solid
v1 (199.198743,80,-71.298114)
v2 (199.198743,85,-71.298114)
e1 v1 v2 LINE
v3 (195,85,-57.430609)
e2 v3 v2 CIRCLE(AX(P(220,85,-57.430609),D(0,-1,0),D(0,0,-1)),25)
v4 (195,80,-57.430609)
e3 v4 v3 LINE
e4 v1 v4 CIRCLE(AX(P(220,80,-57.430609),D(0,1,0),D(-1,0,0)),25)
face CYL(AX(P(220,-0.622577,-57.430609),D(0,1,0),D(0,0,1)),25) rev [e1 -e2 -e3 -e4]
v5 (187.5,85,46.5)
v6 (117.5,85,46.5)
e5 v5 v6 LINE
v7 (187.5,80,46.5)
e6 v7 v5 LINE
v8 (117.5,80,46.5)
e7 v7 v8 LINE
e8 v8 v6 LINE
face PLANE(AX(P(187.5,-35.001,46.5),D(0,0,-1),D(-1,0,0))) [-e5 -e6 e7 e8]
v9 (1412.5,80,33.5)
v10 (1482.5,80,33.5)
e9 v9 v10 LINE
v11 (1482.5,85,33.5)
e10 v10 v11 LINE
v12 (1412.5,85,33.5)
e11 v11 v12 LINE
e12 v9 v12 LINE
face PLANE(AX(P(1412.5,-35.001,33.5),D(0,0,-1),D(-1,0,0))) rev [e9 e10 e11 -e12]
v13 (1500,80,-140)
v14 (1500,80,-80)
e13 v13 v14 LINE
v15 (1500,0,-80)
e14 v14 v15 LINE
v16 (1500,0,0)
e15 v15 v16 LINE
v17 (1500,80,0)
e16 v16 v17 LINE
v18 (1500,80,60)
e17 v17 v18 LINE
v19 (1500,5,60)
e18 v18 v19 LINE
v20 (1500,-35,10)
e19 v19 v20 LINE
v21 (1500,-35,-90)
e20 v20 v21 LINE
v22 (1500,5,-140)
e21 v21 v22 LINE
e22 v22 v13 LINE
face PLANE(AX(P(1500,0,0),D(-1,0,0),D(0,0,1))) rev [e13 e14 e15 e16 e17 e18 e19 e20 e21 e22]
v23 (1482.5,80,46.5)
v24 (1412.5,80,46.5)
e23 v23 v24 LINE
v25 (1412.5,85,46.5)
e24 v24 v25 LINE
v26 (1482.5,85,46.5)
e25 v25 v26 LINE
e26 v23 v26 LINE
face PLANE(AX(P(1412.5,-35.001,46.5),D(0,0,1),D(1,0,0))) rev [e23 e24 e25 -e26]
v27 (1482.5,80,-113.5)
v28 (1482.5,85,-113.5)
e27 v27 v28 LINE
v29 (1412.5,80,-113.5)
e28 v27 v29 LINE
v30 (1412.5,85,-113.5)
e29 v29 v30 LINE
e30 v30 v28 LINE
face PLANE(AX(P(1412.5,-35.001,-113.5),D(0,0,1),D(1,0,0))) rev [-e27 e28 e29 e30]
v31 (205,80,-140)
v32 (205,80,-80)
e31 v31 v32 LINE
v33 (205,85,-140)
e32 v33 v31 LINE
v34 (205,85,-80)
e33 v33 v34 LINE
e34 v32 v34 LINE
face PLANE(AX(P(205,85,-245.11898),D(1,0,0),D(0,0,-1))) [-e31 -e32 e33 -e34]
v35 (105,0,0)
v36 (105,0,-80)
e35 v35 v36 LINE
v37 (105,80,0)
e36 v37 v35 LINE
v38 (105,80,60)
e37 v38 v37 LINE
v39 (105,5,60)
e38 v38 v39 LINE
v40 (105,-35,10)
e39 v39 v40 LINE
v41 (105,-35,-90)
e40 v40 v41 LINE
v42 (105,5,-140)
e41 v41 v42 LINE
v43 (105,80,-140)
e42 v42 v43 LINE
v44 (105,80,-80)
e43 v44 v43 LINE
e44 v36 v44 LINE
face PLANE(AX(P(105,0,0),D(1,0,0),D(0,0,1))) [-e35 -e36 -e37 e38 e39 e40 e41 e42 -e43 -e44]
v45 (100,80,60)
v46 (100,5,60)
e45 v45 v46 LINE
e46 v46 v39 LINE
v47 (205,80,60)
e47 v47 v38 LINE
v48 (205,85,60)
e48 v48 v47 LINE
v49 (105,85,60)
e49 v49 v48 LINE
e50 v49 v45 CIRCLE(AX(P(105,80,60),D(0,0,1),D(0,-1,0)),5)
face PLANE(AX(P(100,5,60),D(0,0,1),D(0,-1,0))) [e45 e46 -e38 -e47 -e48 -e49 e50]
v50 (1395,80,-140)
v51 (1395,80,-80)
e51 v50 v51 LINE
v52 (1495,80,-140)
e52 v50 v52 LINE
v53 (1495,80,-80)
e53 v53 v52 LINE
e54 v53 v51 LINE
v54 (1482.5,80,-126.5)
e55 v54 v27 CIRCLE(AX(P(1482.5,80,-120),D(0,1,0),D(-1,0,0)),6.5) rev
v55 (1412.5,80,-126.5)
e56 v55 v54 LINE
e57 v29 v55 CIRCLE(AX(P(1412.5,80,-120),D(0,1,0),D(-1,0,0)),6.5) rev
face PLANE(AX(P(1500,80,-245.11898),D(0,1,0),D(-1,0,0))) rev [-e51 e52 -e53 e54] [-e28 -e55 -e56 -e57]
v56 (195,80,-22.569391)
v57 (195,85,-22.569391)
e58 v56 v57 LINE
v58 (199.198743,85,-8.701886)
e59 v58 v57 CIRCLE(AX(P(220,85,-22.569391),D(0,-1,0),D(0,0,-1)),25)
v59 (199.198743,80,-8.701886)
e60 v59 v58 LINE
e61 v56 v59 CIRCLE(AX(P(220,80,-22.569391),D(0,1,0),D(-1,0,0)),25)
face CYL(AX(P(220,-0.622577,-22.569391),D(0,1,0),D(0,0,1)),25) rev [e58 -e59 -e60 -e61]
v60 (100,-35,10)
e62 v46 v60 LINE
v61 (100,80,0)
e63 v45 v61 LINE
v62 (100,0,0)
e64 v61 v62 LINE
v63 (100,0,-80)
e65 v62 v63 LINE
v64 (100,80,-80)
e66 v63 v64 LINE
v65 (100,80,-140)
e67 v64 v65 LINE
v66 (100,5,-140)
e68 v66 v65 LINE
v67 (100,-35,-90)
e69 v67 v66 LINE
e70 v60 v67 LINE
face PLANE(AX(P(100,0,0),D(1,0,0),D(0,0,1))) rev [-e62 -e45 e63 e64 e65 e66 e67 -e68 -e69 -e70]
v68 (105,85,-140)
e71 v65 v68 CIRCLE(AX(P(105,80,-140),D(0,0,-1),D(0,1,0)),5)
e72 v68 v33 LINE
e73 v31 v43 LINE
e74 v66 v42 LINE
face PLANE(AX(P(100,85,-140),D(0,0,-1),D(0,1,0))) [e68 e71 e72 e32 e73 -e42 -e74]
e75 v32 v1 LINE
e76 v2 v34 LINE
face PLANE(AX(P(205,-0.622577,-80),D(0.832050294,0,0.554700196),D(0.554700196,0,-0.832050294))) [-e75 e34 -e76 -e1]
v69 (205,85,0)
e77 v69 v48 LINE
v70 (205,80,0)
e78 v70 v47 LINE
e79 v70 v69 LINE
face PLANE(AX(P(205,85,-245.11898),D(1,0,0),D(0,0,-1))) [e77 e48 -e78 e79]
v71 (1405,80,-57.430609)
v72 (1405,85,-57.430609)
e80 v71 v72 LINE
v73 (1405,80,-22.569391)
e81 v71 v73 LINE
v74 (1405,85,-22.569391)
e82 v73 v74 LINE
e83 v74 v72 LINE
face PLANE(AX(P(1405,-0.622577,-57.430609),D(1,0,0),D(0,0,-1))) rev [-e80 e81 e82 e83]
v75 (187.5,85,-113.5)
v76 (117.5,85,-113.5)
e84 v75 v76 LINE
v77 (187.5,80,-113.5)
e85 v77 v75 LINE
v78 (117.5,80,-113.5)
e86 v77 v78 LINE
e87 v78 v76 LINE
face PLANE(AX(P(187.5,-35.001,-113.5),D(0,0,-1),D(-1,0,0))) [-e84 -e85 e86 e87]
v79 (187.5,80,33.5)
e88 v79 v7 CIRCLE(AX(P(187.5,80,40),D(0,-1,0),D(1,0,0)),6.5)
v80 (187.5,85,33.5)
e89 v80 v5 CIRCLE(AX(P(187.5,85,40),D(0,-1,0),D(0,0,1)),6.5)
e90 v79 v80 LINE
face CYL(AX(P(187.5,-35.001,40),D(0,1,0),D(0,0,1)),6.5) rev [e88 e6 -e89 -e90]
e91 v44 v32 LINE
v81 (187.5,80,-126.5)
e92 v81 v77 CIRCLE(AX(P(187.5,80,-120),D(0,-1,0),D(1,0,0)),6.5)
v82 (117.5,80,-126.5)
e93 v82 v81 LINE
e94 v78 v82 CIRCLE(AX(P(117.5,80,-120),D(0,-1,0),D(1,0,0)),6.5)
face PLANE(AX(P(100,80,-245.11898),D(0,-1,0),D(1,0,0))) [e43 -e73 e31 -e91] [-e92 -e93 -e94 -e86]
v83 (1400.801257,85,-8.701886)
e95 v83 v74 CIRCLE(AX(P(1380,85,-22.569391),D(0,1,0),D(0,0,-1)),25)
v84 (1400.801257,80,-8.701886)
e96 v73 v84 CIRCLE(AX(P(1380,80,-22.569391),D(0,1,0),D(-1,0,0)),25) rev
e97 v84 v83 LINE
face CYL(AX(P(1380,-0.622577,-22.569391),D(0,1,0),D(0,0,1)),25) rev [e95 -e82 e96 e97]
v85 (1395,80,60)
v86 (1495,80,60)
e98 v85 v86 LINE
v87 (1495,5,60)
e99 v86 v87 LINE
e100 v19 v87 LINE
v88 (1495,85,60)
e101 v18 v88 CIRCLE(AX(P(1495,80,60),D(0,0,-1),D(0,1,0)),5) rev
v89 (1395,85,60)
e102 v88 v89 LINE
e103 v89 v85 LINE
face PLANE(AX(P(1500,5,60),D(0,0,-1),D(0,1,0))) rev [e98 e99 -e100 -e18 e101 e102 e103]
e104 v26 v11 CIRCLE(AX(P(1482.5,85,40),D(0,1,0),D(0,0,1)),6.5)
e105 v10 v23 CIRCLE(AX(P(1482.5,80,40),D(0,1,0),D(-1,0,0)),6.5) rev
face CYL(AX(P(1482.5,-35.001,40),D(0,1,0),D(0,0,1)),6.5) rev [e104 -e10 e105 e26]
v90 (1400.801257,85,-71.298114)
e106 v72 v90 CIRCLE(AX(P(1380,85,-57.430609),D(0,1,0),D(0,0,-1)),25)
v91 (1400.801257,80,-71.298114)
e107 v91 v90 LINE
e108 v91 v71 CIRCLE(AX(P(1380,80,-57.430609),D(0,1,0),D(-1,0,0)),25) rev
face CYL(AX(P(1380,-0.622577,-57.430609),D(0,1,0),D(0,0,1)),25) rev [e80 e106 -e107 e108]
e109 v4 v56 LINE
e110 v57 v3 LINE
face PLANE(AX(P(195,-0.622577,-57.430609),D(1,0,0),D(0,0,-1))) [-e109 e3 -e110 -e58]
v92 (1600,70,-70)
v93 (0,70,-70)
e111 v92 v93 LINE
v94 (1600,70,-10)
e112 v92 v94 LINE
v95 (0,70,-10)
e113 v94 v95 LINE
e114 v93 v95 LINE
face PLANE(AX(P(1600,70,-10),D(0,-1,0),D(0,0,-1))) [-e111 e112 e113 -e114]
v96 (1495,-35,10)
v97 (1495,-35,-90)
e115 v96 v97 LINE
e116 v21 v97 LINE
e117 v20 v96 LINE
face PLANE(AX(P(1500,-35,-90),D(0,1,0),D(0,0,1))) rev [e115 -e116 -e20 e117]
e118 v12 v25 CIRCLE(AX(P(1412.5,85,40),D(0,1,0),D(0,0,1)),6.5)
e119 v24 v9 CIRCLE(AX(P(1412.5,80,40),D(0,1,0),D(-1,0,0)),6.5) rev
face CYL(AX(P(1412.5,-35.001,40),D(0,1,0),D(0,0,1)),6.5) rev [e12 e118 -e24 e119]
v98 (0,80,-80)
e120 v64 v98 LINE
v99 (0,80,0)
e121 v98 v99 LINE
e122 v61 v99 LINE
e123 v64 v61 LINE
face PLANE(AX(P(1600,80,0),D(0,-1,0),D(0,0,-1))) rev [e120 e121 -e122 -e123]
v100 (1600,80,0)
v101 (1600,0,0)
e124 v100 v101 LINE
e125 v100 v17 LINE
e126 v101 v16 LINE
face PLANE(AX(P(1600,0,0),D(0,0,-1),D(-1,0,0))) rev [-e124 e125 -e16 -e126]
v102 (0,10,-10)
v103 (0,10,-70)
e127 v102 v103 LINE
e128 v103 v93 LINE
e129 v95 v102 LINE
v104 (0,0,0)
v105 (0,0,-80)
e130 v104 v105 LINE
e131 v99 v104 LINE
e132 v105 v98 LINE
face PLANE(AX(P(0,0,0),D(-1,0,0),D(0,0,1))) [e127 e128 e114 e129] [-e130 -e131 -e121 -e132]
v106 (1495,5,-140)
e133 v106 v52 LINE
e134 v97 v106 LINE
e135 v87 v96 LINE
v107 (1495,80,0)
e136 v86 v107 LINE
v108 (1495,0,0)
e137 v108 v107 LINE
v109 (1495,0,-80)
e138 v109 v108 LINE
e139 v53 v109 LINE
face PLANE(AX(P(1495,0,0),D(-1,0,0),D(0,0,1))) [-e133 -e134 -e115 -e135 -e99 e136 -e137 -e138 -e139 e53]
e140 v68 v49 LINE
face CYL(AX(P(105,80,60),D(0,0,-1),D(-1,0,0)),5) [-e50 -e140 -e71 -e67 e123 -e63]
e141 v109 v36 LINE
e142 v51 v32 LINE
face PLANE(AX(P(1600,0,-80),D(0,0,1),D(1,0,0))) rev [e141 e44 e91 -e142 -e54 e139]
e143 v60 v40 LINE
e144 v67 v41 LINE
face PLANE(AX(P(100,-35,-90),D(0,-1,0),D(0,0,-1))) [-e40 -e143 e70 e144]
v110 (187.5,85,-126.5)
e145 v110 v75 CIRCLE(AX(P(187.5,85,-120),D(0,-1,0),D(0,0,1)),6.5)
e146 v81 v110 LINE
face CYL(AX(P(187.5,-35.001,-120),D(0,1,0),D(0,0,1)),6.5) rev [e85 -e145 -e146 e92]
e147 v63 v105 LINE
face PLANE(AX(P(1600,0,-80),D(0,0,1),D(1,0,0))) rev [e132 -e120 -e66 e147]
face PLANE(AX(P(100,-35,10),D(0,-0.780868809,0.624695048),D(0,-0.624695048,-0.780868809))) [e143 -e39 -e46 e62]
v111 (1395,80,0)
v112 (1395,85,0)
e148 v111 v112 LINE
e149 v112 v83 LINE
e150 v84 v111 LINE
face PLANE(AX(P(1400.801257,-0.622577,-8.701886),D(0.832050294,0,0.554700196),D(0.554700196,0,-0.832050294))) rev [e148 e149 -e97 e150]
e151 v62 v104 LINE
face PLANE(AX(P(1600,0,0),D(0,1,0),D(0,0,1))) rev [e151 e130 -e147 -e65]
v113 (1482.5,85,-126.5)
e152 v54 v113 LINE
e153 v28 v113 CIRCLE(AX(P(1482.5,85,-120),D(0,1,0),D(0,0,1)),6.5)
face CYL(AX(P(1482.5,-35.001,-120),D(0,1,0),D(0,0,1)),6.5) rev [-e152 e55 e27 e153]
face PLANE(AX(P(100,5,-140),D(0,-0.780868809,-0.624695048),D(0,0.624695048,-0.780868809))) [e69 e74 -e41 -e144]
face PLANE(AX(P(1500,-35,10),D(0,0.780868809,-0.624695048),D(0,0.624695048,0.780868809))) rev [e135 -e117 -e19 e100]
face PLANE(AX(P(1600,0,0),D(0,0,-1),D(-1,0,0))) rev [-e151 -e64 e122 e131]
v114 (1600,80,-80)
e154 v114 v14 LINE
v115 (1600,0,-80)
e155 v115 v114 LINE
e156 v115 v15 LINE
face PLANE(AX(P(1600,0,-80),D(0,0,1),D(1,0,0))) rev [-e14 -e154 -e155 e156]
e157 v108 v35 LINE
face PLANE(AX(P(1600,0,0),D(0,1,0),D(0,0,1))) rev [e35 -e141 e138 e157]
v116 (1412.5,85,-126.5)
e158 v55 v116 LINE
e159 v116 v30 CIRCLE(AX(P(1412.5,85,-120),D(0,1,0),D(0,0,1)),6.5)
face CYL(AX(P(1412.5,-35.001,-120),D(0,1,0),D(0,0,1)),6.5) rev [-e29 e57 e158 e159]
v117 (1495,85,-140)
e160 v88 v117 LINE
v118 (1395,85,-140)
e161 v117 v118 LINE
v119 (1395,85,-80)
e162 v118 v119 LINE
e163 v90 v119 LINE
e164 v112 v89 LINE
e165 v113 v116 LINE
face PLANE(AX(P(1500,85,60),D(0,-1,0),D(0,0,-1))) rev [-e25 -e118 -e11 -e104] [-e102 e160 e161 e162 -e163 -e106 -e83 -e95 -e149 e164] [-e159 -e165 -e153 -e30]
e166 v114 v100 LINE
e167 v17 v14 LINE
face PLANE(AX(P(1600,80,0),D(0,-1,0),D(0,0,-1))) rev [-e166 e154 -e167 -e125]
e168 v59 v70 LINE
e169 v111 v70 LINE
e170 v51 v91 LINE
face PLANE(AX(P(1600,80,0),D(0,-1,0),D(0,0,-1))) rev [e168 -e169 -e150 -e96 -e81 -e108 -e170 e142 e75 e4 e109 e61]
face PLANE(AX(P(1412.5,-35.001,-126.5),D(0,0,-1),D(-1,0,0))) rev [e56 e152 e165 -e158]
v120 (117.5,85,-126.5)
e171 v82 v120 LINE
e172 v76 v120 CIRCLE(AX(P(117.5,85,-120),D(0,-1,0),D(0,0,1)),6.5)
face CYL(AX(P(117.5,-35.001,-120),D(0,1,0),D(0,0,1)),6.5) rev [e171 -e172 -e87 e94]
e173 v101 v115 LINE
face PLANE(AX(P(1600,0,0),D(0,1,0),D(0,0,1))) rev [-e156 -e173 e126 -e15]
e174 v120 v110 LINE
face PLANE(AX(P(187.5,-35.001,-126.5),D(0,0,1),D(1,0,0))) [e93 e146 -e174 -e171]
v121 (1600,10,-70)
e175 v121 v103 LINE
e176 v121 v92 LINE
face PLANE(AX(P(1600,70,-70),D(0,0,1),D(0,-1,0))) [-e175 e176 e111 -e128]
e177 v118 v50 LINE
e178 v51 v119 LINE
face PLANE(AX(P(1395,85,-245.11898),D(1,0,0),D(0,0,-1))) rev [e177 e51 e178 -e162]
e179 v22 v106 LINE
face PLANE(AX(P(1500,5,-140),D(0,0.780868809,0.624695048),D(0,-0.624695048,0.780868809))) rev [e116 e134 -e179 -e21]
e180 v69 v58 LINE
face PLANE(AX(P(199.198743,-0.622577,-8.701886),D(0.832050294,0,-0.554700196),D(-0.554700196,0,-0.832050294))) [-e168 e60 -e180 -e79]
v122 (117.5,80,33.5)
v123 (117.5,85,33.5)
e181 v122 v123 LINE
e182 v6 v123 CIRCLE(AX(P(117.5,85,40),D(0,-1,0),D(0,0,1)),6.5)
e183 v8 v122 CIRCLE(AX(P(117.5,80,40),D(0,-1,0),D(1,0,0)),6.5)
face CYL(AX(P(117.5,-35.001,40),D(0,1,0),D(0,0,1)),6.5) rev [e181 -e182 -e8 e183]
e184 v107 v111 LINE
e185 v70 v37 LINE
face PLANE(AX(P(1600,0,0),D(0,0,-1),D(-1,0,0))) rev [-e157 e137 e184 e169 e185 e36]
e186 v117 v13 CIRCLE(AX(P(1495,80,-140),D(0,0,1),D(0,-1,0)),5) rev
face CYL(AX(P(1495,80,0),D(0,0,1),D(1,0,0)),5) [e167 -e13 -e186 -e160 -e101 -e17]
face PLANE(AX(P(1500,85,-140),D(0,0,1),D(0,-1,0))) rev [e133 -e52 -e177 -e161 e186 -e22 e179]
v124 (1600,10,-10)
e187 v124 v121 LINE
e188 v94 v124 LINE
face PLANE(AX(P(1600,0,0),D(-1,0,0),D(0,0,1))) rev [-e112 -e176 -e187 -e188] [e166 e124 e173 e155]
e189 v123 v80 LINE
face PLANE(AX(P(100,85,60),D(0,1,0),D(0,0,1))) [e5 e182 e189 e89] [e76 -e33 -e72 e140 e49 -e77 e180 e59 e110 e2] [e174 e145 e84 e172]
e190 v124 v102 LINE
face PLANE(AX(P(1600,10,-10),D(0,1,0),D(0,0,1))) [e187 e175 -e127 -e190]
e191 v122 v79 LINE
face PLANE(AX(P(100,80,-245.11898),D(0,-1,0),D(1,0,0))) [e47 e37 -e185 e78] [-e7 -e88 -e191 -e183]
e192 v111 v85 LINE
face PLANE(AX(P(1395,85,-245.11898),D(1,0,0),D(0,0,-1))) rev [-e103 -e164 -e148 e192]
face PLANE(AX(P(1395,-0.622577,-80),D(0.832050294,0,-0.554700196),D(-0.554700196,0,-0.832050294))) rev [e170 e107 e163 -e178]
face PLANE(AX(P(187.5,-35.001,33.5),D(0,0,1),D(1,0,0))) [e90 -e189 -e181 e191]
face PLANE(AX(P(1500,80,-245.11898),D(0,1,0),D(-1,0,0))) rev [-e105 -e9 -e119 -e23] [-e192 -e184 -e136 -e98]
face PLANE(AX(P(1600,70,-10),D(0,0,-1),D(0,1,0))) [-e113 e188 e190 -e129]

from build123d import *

# Parameters (mm, degrees)
SKETCH3_W                       = 80
SKETCH3_H                       = 80
SKETCH3_W_2                     = 60
SKETCH3_H_2                     = 60
BOSS_EXTRUDE2_DEPTH             = 1600
SKETCH7_W                       = 60
SKETCH7_H                       = 60
BOSS_EXTRUDE3_DEPTH             = 5
BOSS_EXTRUDE4_REACH             = 1610.361
SKETCH8_W                       = 105
SKETCH8_H                       = 5
BOSS_EXTRUDE4_DIRECTION_2_REACH = 1610.361
CUT_EXTRUDE1_DEPTH              = 5
CUT_EXTRUDE2_REACH              = 1612.59
FILLET1_R                       = 5
FILLET1_OF_MIRROR1_R            = 5
FILLET1_OF_MIRROR2_R            = 5


with BuildPart() as part:
    # Sketch3 → Boss-Extrude2 (new body)
    with BuildSketch(Plane(origin=(0, 0, 0), x_dir=(0, 0, -1), z_dir=(1, 0, 0))):
        with Locations((40, 40)):
            Rectangle(SKETCH3_W, SKETCH3_H)
        with Locations((40, 40)):
            Rectangle(SKETCH3_W_2, SKETCH3_H_2, mode=Mode.SUBTRACT)
    extrude(amount=BOSS_EXTRUDE2_DEPTH)

    # Sketch7 → Boss-Extrude3 (add)
    with BuildSketch(Plane(origin=(1495, 0, 0), x_dir=(0, 0, -1), z_dir=(1, 0, 0))):
        Polygon((-60, 85), (140, 85), (140, 5), (90, -35), (-10, -35), (-60, 5), align=None)
        with Locations((40, 40)):
            Rectangle(SKETCH7_W, SKETCH7_H, mode=Mode.SUBTRACT)
    boss_extrude3 = extrude(amount=BOSS_EXTRUDE3_DEPTH)

    # Boss-Extrude4: up to this face of the body (flat: up to its plane)
    boss_extrude4_end = Plane(part.part.faces().sort_by_distance((1497.5, 45, -140))[0])
    # Sketch8 → Boss-Extrude4 (add, up to the picked face)
    with BuildSketch(Plane(origin=(0, 0, -80), x_dir=(-1, 0, 0), z_dir=(0, 0, -1)), mode=Mode.PRIVATE) as boss_extrude4_sk1:
        with Locations((-1447.5, 82.5)):
            Rectangle(SKETCH8_W, SKETCH8_H)
    boss_extrude4_tool1 = split(extrude(boss_extrude4_sk1.sketch, amount=BOSS_EXTRUDE4_REACH, mode=Mode.PRIVATE), bisect_by=boss_extrude4_end, keep=Keep.BOTH, mode=Mode.PRIVATE)
    boss_extrude4 = boss_extrude4_tool1.solids().sort_by(Axis((1447.5, 82.5, -80), (0, 0, -1)))[0]
    add(boss_extrude4)

    # Boss-Extrude4 direction 2: up to this face of the body (flat: up to its plane)
    boss_extrude4_direction_2_end = Plane(part.part.faces().sort_by_distance((1497.5, 45, 60))[0])
    # Sketch8 → Boss-Extrude4 direction 2 (add, up to the picked face)
    with BuildSketch(Plane(origin=(0, 0, -80), x_dir=(-1, 0, 0), z_dir=(0, 0, -1)), mode=Mode.PRIVATE) as boss_extrude4_direction_2_sk1:
        with Locations((-1447.5, 82.5)):
            Rectangle(SKETCH8_W, SKETCH8_H)
    boss_extrude4_direction_2_tool1 = split(extrude(boss_extrude4_direction_2_sk1.sketch, amount=-BOSS_EXTRUDE4_DIRECTION_2_REACH, mode=Mode.PRIVATE), bisect_by=boss_extrude4_direction_2_end, keep=Keep.BOTH, mode=Mode.PRIVATE)
    boss_extrude4_direction_2 = boss_extrude4_direction_2_tool1.solids().sort_by(Axis((1447.5, 82.5, -80), (0, 0, 1)))[0]
    add(boss_extrude4_direction_2)

    # Sketch9 → Cut-Extrude1 (cut)
    with BuildSketch(Plane(origin=(0, 85, 0), x_dir=(1, 0, 0), z_dir=(0, 1, 0))):
        with BuildLine():
            Line((1395, 80), (1400.801257358, 71.298113962))
            ThreePointArc((1400.801257358, 71.298113962), (1403.927300662, 64.675212774), (1405, 57.430609057))
            Line((1405, 57.430609057), (1405, 22.569390943))
            ThreePointArc((1405, 22.569390943), (1403.927300662, 15.324787226), (1400.801257358, 8.701886038))
            Line((1400.801257358, 8.701886038), (1395, 0))
            Line((1395, 0), (1395, 80))
        make_face()
    cut_extrude1 = extrude(amount=-CUT_EXTRUDE1_DEPTH, mode=Mode.SUBTRACT)

    # Sketch10 → Cut-Extrude2 (cut, up to next)
    with BuildSketch(Plane(origin=(0, 85, 0), x_dir=(1, 0, 0), z_dir=(0, 1, 0)), mode=Mode.PRIVATE) as cut_extrude2_sk1:
        with BuildLine():
            Line((1412.5, 126.5), (1482.5, 126.5))
            ThreePointArc((1482.5, 126.5), (1489, 120), (1482.5, 113.5))
            Line((1482.5, 113.5), (1412.5, 113.5))
            ThreePointArc((1412.5, 113.5), (1406, 120), (1412.5, 126.5))
        make_face()
    cut_extrude2_tool1 = extrude(cut_extrude2_sk1.sketch, amount=-CUT_EXTRUDE2_REACH, mode=Mode.PRIVATE) & part.part
    # Sketch10 → Cut-Extrude2 (cut, up to next)
    with BuildSketch(Plane(origin=(0, 85, 0), x_dir=(1, 0, 0), z_dir=(0, 1, 0)), mode=Mode.PRIVATE) as cut_extrude2_sk2:
        with BuildLine():
            Line((1412.5, -33.5), (1482.5, -33.5))
            ThreePointArc((1482.5, -33.5), (1489, -40), (1482.5, -46.5))
            Line((1482.5, -46.5), (1412.5, -46.5))
            ThreePointArc((1412.5, -46.5), (1406, -40), (1412.5, -33.5))
        make_face()
    cut_extrude2_tool2 = extrude(cut_extrude2_sk2.sketch, amount=-CUT_EXTRUDE2_REACH, mode=Mode.PRIVATE) & part.part
    cut_extrude2_1 = cut_extrude2_tool1.solids().sort_by_distance((1447.5, 85, -120))[0]
    add(cut_extrude2_1, mode=Mode.SUBTRACT)
    cut_extrude2_2 = cut_extrude2_tool2.solids().sort_by_distance((1447.5, 85, 40))[0]
    add(cut_extrude2_2, mode=Mode.SUBTRACT)
    cut_extrude2 = cut_extrude2_1 + cut_extrude2_2  # Cut-Extrude2 as one shape, for the pattern or mirror that repeats it

    # Fillet1
    fillet1_edges = [part.edges().sort_by_distance(p)[0] for p in [
        (1500, 85, -40),
    ]]
    fillet(fillet1_edges, radius=FILLET1_R - 0.0001)  # a hair under: the kernel refuses the full size

    # Mirror1: Boss-Extrude3 across plane
    add(boss_extrude3.mirror(Plane(origin=(800, 0, 0), x_dir=(0, 0, 1), z_dir=(1, 0, 0))))

    # Fillet1 of Mirror1
    fillet1_of_mirror1_edges = [part.edges().sort_by_distance(p)[0] for p in [
        (100, 85, -40),
    ]]
    fillet(fillet1_of_mirror1_edges, radius=FILLET1_OF_MIRROR1_R - 0.0001)  # a hair under: the kernel refuses the full size

    # Mirror2: Boss-Extrude3, Boss-Extrude4, Boss-Extrude4 direction 2, Cut-Extrude1, Cut-Extrude2 across plane
    add(boss_extrude3.mirror(Plane(origin=(800, 0, 0), x_dir=(0, 0, 1), z_dir=(1, 0, 0))))
    add(boss_extrude4.mirror(Plane(origin=(800, 0, 0), x_dir=(0, 0, 1), z_dir=(1, 0, 0))))
    add(boss_extrude4_direction_2.mirror(Plane(origin=(800, 0, 0), x_dir=(0, 0, 1), z_dir=(1, 0, 0))))
    add(cut_extrude1.mirror(Plane(origin=(800, 0, 0), x_dir=(0, 0, 1), z_dir=(1, 0, 0))), mode=Mode.SUBTRACT)
    add(cut_extrude2.mirror(Plane(origin=(800, 0, 0), x_dir=(0, 0, 1), z_dir=(1, 0, 0))), mode=Mode.SUBTRACT)

    # Fillet1 of Mirror2
    fillet1_of_mirror2_edges = [part.edges().sort_by_distance(p)[0] for p in [
        (100, 85, -40),
    ]]
    fillet(fillet1_of_mirror2_edges, radius=FILLET1_OF_MIRROR2_R - 0.0001)  # a hair under: the kernel refuses the full size


solid = part.part
